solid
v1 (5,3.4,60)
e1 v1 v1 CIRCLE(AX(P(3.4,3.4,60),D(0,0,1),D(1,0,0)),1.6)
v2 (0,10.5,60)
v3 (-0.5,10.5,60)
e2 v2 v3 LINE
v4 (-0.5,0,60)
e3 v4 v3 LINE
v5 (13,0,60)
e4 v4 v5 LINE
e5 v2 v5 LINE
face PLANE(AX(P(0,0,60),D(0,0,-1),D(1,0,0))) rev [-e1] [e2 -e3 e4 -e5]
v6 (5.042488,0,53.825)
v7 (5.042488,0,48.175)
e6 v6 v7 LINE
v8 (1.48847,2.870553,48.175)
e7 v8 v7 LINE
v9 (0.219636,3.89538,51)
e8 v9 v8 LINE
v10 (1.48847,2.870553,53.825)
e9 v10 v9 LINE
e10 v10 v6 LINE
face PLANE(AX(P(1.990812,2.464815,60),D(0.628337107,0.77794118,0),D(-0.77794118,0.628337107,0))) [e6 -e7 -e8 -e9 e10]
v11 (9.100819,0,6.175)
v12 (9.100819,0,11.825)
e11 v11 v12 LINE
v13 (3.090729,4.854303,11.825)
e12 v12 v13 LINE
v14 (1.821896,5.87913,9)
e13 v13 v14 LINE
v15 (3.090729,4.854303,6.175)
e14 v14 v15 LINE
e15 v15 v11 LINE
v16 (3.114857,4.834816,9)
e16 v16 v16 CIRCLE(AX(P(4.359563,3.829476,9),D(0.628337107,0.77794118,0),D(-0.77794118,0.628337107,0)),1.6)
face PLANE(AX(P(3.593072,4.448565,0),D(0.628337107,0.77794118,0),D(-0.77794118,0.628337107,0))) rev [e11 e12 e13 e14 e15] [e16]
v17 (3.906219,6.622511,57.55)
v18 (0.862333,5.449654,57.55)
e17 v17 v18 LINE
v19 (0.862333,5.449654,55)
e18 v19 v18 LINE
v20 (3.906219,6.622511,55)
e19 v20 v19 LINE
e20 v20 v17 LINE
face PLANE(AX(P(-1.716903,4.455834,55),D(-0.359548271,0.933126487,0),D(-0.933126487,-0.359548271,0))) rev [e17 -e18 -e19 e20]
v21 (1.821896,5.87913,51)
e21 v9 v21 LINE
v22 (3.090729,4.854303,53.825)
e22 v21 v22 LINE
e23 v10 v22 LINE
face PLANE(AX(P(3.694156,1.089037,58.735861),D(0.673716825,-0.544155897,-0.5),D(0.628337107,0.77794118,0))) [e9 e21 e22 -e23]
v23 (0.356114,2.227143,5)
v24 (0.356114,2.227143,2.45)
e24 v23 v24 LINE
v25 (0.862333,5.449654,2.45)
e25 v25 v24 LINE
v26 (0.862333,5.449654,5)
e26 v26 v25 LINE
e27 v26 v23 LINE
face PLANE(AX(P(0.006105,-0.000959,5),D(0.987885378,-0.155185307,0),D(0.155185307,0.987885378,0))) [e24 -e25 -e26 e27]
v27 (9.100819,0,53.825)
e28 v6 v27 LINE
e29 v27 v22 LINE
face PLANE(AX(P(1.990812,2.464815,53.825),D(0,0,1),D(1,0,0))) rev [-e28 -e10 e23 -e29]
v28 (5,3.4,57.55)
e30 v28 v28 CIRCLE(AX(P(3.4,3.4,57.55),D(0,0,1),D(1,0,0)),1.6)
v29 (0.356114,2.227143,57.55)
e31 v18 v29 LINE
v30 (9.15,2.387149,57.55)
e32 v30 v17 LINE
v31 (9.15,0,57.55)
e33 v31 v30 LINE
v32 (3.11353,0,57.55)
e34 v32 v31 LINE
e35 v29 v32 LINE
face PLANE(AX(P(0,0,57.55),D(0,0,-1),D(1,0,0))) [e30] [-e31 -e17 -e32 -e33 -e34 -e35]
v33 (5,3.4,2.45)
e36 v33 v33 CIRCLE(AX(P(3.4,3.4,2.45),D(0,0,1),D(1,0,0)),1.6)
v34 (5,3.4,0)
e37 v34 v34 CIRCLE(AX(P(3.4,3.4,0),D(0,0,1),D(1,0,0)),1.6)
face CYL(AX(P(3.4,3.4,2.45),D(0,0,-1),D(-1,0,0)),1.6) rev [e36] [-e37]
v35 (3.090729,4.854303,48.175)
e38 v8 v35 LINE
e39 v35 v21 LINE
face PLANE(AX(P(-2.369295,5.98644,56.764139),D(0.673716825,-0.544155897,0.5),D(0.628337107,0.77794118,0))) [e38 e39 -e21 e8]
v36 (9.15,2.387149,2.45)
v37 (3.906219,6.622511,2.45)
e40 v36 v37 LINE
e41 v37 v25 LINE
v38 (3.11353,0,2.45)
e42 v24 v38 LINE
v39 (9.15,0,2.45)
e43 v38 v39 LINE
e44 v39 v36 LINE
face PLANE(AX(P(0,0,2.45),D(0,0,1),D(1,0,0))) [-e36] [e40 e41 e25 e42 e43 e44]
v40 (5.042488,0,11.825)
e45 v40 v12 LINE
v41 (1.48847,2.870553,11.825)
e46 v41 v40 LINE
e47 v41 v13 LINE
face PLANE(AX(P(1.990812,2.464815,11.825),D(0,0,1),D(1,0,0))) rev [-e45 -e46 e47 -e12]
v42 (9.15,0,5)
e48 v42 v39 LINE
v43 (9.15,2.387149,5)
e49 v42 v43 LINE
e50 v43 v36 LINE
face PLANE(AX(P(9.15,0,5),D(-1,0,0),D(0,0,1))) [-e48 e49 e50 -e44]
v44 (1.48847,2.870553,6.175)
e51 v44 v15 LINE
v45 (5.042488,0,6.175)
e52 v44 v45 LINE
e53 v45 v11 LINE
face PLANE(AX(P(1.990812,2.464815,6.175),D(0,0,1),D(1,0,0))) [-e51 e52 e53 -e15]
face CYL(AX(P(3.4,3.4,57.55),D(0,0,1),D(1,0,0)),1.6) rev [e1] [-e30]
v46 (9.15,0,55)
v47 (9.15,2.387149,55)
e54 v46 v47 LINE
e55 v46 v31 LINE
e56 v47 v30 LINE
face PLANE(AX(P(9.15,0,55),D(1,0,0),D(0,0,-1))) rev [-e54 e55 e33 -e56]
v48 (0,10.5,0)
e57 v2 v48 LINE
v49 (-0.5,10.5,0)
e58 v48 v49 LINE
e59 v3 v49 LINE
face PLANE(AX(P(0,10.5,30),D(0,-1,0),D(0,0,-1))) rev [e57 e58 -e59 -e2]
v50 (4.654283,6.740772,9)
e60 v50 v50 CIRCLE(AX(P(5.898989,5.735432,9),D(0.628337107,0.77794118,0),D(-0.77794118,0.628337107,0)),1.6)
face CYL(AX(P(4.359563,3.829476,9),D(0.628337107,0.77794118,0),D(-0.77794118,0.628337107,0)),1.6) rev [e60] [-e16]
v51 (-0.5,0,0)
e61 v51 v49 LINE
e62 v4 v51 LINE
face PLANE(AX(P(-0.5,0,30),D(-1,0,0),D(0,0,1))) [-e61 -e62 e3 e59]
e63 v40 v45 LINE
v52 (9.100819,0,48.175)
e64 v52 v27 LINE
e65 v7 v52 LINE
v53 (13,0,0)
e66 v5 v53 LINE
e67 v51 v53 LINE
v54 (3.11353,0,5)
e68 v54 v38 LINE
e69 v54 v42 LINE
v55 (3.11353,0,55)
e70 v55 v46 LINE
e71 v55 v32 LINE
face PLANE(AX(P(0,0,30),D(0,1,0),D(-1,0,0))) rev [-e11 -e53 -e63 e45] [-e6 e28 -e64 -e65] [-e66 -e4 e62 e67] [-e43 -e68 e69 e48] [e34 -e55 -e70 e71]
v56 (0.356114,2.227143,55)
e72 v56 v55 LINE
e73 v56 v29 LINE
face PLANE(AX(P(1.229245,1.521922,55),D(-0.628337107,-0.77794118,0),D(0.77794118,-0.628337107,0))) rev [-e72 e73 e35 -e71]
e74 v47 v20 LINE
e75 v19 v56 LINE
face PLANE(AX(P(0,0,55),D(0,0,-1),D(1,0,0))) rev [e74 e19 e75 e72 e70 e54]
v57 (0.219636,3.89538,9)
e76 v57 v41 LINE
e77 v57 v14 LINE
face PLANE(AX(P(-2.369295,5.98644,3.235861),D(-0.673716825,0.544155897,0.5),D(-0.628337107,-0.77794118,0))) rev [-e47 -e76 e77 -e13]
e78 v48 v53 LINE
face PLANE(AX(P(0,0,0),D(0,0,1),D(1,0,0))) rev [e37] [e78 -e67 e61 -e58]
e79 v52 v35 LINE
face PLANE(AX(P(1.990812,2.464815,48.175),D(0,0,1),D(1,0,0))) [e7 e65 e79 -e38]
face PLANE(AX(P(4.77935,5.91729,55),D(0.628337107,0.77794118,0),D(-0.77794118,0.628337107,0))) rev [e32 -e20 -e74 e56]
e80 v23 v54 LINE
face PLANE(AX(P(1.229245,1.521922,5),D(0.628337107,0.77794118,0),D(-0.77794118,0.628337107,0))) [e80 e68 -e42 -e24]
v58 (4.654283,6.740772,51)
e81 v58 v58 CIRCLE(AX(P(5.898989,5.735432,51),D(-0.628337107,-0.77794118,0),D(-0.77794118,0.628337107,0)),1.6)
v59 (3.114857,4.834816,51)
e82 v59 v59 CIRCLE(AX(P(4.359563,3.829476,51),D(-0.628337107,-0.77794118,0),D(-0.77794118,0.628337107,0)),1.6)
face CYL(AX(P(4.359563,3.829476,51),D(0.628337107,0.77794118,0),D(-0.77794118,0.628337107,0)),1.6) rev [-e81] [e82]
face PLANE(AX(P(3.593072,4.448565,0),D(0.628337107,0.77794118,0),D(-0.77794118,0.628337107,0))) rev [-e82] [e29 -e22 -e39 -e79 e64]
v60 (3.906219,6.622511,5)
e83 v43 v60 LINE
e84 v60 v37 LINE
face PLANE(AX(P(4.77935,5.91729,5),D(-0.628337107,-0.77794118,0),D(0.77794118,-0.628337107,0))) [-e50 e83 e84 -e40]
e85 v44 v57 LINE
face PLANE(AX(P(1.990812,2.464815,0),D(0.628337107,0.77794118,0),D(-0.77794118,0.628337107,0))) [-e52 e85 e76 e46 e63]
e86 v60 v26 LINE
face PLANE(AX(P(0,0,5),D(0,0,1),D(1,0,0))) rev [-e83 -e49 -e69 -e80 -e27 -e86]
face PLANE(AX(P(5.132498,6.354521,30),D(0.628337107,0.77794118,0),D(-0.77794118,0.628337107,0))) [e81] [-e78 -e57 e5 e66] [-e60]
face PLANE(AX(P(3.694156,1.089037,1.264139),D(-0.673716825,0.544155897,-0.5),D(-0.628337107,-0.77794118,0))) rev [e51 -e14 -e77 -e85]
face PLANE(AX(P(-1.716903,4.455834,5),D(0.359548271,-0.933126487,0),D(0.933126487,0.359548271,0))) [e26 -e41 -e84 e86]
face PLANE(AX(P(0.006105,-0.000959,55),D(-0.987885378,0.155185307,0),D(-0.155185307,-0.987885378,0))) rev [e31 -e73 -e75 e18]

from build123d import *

# Parameters (mm, degrees)
BOSS_EXTRUDE1_DEPTH     = 30
SKETCH1_13_W            = 0.5
SKETCH1_13_H            = 10.5
BOSS_EXTRUDE6_DEPTH     = 30
CUT_EXTRUDE3_DEPTH      = 5
BOSS_EXTRUDE4_START     = -2.45
BOSS_EXTRUDE4_OUTLINE_R = 1.6
BOSS_EXTRUDE4_DEPTH     = 2.45
CUT_EXTRUDE1_DEPTH      = 5
SKETCH1_10_R            = 1.6
BOSS_EXTRUDE5_DEPTH     = 2.45
CUT_EXTRUDE4_DEPTH      = 63.283625457


# Read off the part's stored shape, not the designer's step: Boss-Extrude4
with BuildPart() as part:
    # Sketch1 → Boss-Extrude1 (new body)
    with BuildSketch(Plane.XY):
        Polygon((13, 0), (0, 10.5), (0, 0), align=None)
    boss_extrude1 = extrude(amount=BOSS_EXTRUDE1_DEPTH)

    # Sketch1<13> → Boss-Extrude6 (add)
    with BuildSketch(Plane.XY):
        with Locations((-0.25, 5.25)):
            Rectangle(SKETCH1_13_W, SKETCH1_13_H)
    boss_extrude6 = extrude(amount=BOSS_EXTRUDE6_DEPTH)

    # Sketch4 → Cut-Extrude3 (cut)
    with BuildSketch(Plane(origin=(5.132497762, 6.354521038, 0), x_dir=(0, 0, -1), z_dir=(0.6283371070876215, 0.7779411802037215, 0))):
        Polygon((-11.825, -10.113235343), (-6.175, -10.113235343), (-6.175, 0.645733136), (-9, 2.276747647), (-11.825, 0.645733136), align=None)
    cut_extrude3 = extrude(amount=-CUT_EXTRUDE3_DEPTH, mode=Mode.SUBTRACT)

    # Boss-Extrude4 outline → Boss-Extrude4 (add)
    with BuildSketch(Plane(origin=(5.132497762, 6.354521038, 0), x_dir=(0, 0, -1), z_dir=(0.6283371070876215, 0.7779411802037215, 0)).offset(BOSS_EXTRUDE4_START)):
        Polygon((-6.175, -0.985281374), (0, -0.985281374), (0, 3.886764657), (-30, 3.886764657), (-30, -10.113235343), (0, -10.113235343), (0, -8.485281374), (-6.175, -8.485281374), align=None)
        with Locations((-9, -0.985281374)):
            Circle(BOSS_EXTRUDE4_OUTLINE_R, mode=Mode.SUBTRACT)
    boss_extrude4 = extrude(amount=BOSS_EXTRUDE4_DEPTH)

    # Sketch1<4> → Cut-Extrude1 (cut)
    with BuildSketch(Plane.XY):
        Polygon((9.15, 0), (9.15, 2.387149176), (3.906218974, 6.622510773), (0.862333294, 5.449653878), (0.356114319, 2.227143105), (3.113529592, 0), align=None)
    cut_extrude1 = extrude(amount=CUT_EXTRUDE1_DEPTH, mode=Mode.SUBTRACT)

    # Sketch1<10> → Boss-Extrude5 (add)
    with BuildSketch(Plane.XY):
        Polygon((3.113529592, 0), (9.15, 0), (9.15, 2.387149176), (3.906218974, 6.622510773), (0.862333294, 5.449653878), (0.356114319, 2.227143105), align=None)
        with Locations((3.4, 3.4)):
            Circle(SKETCH1_10_R, mode=Mode.SUBTRACT)
    boss_extrude5 = extrude(amount=BOSS_EXTRUDE5_DEPTH)

    # Mirror1: Boss-Extrude1, Boss-Extrude6, Cut-Extrude3, Boss-Extrude4, Cut-Extrude1, Boss-Extrude5 across plane
    add(boss_extrude1.mirror(Plane.XY.offset(30)))
    add(boss_extrude6.mirror(Plane.XY.offset(30)))
    add(cut_extrude3.mirror(Plane.XY.offset(30)), mode=Mode.SUBTRACT)
    add(boss_extrude4.mirror(Plane.XY.offset(30)))
    add(cut_extrude1.mirror(Plane.XY.offset(30)), mode=Mode.SUBTRACT)
    add(boss_extrude5.mirror(Plane.XY.offset(30)))

    # Sketch1<12> → Cut-Extrude4 (cut, through all)
    with BuildSketch(Plane.XY):
        Polygon((13, -3.5), (13, 0), (12.105518027, 0), (9.15, 0), (3.4, 0), (3.113529592, 0), (0, 0), (0, -3.5), align=None)
    extrude(amount=CUT_EXTRUDE4_DEPTH, mode=Mode.SUBTRACT)


solid = part.part
